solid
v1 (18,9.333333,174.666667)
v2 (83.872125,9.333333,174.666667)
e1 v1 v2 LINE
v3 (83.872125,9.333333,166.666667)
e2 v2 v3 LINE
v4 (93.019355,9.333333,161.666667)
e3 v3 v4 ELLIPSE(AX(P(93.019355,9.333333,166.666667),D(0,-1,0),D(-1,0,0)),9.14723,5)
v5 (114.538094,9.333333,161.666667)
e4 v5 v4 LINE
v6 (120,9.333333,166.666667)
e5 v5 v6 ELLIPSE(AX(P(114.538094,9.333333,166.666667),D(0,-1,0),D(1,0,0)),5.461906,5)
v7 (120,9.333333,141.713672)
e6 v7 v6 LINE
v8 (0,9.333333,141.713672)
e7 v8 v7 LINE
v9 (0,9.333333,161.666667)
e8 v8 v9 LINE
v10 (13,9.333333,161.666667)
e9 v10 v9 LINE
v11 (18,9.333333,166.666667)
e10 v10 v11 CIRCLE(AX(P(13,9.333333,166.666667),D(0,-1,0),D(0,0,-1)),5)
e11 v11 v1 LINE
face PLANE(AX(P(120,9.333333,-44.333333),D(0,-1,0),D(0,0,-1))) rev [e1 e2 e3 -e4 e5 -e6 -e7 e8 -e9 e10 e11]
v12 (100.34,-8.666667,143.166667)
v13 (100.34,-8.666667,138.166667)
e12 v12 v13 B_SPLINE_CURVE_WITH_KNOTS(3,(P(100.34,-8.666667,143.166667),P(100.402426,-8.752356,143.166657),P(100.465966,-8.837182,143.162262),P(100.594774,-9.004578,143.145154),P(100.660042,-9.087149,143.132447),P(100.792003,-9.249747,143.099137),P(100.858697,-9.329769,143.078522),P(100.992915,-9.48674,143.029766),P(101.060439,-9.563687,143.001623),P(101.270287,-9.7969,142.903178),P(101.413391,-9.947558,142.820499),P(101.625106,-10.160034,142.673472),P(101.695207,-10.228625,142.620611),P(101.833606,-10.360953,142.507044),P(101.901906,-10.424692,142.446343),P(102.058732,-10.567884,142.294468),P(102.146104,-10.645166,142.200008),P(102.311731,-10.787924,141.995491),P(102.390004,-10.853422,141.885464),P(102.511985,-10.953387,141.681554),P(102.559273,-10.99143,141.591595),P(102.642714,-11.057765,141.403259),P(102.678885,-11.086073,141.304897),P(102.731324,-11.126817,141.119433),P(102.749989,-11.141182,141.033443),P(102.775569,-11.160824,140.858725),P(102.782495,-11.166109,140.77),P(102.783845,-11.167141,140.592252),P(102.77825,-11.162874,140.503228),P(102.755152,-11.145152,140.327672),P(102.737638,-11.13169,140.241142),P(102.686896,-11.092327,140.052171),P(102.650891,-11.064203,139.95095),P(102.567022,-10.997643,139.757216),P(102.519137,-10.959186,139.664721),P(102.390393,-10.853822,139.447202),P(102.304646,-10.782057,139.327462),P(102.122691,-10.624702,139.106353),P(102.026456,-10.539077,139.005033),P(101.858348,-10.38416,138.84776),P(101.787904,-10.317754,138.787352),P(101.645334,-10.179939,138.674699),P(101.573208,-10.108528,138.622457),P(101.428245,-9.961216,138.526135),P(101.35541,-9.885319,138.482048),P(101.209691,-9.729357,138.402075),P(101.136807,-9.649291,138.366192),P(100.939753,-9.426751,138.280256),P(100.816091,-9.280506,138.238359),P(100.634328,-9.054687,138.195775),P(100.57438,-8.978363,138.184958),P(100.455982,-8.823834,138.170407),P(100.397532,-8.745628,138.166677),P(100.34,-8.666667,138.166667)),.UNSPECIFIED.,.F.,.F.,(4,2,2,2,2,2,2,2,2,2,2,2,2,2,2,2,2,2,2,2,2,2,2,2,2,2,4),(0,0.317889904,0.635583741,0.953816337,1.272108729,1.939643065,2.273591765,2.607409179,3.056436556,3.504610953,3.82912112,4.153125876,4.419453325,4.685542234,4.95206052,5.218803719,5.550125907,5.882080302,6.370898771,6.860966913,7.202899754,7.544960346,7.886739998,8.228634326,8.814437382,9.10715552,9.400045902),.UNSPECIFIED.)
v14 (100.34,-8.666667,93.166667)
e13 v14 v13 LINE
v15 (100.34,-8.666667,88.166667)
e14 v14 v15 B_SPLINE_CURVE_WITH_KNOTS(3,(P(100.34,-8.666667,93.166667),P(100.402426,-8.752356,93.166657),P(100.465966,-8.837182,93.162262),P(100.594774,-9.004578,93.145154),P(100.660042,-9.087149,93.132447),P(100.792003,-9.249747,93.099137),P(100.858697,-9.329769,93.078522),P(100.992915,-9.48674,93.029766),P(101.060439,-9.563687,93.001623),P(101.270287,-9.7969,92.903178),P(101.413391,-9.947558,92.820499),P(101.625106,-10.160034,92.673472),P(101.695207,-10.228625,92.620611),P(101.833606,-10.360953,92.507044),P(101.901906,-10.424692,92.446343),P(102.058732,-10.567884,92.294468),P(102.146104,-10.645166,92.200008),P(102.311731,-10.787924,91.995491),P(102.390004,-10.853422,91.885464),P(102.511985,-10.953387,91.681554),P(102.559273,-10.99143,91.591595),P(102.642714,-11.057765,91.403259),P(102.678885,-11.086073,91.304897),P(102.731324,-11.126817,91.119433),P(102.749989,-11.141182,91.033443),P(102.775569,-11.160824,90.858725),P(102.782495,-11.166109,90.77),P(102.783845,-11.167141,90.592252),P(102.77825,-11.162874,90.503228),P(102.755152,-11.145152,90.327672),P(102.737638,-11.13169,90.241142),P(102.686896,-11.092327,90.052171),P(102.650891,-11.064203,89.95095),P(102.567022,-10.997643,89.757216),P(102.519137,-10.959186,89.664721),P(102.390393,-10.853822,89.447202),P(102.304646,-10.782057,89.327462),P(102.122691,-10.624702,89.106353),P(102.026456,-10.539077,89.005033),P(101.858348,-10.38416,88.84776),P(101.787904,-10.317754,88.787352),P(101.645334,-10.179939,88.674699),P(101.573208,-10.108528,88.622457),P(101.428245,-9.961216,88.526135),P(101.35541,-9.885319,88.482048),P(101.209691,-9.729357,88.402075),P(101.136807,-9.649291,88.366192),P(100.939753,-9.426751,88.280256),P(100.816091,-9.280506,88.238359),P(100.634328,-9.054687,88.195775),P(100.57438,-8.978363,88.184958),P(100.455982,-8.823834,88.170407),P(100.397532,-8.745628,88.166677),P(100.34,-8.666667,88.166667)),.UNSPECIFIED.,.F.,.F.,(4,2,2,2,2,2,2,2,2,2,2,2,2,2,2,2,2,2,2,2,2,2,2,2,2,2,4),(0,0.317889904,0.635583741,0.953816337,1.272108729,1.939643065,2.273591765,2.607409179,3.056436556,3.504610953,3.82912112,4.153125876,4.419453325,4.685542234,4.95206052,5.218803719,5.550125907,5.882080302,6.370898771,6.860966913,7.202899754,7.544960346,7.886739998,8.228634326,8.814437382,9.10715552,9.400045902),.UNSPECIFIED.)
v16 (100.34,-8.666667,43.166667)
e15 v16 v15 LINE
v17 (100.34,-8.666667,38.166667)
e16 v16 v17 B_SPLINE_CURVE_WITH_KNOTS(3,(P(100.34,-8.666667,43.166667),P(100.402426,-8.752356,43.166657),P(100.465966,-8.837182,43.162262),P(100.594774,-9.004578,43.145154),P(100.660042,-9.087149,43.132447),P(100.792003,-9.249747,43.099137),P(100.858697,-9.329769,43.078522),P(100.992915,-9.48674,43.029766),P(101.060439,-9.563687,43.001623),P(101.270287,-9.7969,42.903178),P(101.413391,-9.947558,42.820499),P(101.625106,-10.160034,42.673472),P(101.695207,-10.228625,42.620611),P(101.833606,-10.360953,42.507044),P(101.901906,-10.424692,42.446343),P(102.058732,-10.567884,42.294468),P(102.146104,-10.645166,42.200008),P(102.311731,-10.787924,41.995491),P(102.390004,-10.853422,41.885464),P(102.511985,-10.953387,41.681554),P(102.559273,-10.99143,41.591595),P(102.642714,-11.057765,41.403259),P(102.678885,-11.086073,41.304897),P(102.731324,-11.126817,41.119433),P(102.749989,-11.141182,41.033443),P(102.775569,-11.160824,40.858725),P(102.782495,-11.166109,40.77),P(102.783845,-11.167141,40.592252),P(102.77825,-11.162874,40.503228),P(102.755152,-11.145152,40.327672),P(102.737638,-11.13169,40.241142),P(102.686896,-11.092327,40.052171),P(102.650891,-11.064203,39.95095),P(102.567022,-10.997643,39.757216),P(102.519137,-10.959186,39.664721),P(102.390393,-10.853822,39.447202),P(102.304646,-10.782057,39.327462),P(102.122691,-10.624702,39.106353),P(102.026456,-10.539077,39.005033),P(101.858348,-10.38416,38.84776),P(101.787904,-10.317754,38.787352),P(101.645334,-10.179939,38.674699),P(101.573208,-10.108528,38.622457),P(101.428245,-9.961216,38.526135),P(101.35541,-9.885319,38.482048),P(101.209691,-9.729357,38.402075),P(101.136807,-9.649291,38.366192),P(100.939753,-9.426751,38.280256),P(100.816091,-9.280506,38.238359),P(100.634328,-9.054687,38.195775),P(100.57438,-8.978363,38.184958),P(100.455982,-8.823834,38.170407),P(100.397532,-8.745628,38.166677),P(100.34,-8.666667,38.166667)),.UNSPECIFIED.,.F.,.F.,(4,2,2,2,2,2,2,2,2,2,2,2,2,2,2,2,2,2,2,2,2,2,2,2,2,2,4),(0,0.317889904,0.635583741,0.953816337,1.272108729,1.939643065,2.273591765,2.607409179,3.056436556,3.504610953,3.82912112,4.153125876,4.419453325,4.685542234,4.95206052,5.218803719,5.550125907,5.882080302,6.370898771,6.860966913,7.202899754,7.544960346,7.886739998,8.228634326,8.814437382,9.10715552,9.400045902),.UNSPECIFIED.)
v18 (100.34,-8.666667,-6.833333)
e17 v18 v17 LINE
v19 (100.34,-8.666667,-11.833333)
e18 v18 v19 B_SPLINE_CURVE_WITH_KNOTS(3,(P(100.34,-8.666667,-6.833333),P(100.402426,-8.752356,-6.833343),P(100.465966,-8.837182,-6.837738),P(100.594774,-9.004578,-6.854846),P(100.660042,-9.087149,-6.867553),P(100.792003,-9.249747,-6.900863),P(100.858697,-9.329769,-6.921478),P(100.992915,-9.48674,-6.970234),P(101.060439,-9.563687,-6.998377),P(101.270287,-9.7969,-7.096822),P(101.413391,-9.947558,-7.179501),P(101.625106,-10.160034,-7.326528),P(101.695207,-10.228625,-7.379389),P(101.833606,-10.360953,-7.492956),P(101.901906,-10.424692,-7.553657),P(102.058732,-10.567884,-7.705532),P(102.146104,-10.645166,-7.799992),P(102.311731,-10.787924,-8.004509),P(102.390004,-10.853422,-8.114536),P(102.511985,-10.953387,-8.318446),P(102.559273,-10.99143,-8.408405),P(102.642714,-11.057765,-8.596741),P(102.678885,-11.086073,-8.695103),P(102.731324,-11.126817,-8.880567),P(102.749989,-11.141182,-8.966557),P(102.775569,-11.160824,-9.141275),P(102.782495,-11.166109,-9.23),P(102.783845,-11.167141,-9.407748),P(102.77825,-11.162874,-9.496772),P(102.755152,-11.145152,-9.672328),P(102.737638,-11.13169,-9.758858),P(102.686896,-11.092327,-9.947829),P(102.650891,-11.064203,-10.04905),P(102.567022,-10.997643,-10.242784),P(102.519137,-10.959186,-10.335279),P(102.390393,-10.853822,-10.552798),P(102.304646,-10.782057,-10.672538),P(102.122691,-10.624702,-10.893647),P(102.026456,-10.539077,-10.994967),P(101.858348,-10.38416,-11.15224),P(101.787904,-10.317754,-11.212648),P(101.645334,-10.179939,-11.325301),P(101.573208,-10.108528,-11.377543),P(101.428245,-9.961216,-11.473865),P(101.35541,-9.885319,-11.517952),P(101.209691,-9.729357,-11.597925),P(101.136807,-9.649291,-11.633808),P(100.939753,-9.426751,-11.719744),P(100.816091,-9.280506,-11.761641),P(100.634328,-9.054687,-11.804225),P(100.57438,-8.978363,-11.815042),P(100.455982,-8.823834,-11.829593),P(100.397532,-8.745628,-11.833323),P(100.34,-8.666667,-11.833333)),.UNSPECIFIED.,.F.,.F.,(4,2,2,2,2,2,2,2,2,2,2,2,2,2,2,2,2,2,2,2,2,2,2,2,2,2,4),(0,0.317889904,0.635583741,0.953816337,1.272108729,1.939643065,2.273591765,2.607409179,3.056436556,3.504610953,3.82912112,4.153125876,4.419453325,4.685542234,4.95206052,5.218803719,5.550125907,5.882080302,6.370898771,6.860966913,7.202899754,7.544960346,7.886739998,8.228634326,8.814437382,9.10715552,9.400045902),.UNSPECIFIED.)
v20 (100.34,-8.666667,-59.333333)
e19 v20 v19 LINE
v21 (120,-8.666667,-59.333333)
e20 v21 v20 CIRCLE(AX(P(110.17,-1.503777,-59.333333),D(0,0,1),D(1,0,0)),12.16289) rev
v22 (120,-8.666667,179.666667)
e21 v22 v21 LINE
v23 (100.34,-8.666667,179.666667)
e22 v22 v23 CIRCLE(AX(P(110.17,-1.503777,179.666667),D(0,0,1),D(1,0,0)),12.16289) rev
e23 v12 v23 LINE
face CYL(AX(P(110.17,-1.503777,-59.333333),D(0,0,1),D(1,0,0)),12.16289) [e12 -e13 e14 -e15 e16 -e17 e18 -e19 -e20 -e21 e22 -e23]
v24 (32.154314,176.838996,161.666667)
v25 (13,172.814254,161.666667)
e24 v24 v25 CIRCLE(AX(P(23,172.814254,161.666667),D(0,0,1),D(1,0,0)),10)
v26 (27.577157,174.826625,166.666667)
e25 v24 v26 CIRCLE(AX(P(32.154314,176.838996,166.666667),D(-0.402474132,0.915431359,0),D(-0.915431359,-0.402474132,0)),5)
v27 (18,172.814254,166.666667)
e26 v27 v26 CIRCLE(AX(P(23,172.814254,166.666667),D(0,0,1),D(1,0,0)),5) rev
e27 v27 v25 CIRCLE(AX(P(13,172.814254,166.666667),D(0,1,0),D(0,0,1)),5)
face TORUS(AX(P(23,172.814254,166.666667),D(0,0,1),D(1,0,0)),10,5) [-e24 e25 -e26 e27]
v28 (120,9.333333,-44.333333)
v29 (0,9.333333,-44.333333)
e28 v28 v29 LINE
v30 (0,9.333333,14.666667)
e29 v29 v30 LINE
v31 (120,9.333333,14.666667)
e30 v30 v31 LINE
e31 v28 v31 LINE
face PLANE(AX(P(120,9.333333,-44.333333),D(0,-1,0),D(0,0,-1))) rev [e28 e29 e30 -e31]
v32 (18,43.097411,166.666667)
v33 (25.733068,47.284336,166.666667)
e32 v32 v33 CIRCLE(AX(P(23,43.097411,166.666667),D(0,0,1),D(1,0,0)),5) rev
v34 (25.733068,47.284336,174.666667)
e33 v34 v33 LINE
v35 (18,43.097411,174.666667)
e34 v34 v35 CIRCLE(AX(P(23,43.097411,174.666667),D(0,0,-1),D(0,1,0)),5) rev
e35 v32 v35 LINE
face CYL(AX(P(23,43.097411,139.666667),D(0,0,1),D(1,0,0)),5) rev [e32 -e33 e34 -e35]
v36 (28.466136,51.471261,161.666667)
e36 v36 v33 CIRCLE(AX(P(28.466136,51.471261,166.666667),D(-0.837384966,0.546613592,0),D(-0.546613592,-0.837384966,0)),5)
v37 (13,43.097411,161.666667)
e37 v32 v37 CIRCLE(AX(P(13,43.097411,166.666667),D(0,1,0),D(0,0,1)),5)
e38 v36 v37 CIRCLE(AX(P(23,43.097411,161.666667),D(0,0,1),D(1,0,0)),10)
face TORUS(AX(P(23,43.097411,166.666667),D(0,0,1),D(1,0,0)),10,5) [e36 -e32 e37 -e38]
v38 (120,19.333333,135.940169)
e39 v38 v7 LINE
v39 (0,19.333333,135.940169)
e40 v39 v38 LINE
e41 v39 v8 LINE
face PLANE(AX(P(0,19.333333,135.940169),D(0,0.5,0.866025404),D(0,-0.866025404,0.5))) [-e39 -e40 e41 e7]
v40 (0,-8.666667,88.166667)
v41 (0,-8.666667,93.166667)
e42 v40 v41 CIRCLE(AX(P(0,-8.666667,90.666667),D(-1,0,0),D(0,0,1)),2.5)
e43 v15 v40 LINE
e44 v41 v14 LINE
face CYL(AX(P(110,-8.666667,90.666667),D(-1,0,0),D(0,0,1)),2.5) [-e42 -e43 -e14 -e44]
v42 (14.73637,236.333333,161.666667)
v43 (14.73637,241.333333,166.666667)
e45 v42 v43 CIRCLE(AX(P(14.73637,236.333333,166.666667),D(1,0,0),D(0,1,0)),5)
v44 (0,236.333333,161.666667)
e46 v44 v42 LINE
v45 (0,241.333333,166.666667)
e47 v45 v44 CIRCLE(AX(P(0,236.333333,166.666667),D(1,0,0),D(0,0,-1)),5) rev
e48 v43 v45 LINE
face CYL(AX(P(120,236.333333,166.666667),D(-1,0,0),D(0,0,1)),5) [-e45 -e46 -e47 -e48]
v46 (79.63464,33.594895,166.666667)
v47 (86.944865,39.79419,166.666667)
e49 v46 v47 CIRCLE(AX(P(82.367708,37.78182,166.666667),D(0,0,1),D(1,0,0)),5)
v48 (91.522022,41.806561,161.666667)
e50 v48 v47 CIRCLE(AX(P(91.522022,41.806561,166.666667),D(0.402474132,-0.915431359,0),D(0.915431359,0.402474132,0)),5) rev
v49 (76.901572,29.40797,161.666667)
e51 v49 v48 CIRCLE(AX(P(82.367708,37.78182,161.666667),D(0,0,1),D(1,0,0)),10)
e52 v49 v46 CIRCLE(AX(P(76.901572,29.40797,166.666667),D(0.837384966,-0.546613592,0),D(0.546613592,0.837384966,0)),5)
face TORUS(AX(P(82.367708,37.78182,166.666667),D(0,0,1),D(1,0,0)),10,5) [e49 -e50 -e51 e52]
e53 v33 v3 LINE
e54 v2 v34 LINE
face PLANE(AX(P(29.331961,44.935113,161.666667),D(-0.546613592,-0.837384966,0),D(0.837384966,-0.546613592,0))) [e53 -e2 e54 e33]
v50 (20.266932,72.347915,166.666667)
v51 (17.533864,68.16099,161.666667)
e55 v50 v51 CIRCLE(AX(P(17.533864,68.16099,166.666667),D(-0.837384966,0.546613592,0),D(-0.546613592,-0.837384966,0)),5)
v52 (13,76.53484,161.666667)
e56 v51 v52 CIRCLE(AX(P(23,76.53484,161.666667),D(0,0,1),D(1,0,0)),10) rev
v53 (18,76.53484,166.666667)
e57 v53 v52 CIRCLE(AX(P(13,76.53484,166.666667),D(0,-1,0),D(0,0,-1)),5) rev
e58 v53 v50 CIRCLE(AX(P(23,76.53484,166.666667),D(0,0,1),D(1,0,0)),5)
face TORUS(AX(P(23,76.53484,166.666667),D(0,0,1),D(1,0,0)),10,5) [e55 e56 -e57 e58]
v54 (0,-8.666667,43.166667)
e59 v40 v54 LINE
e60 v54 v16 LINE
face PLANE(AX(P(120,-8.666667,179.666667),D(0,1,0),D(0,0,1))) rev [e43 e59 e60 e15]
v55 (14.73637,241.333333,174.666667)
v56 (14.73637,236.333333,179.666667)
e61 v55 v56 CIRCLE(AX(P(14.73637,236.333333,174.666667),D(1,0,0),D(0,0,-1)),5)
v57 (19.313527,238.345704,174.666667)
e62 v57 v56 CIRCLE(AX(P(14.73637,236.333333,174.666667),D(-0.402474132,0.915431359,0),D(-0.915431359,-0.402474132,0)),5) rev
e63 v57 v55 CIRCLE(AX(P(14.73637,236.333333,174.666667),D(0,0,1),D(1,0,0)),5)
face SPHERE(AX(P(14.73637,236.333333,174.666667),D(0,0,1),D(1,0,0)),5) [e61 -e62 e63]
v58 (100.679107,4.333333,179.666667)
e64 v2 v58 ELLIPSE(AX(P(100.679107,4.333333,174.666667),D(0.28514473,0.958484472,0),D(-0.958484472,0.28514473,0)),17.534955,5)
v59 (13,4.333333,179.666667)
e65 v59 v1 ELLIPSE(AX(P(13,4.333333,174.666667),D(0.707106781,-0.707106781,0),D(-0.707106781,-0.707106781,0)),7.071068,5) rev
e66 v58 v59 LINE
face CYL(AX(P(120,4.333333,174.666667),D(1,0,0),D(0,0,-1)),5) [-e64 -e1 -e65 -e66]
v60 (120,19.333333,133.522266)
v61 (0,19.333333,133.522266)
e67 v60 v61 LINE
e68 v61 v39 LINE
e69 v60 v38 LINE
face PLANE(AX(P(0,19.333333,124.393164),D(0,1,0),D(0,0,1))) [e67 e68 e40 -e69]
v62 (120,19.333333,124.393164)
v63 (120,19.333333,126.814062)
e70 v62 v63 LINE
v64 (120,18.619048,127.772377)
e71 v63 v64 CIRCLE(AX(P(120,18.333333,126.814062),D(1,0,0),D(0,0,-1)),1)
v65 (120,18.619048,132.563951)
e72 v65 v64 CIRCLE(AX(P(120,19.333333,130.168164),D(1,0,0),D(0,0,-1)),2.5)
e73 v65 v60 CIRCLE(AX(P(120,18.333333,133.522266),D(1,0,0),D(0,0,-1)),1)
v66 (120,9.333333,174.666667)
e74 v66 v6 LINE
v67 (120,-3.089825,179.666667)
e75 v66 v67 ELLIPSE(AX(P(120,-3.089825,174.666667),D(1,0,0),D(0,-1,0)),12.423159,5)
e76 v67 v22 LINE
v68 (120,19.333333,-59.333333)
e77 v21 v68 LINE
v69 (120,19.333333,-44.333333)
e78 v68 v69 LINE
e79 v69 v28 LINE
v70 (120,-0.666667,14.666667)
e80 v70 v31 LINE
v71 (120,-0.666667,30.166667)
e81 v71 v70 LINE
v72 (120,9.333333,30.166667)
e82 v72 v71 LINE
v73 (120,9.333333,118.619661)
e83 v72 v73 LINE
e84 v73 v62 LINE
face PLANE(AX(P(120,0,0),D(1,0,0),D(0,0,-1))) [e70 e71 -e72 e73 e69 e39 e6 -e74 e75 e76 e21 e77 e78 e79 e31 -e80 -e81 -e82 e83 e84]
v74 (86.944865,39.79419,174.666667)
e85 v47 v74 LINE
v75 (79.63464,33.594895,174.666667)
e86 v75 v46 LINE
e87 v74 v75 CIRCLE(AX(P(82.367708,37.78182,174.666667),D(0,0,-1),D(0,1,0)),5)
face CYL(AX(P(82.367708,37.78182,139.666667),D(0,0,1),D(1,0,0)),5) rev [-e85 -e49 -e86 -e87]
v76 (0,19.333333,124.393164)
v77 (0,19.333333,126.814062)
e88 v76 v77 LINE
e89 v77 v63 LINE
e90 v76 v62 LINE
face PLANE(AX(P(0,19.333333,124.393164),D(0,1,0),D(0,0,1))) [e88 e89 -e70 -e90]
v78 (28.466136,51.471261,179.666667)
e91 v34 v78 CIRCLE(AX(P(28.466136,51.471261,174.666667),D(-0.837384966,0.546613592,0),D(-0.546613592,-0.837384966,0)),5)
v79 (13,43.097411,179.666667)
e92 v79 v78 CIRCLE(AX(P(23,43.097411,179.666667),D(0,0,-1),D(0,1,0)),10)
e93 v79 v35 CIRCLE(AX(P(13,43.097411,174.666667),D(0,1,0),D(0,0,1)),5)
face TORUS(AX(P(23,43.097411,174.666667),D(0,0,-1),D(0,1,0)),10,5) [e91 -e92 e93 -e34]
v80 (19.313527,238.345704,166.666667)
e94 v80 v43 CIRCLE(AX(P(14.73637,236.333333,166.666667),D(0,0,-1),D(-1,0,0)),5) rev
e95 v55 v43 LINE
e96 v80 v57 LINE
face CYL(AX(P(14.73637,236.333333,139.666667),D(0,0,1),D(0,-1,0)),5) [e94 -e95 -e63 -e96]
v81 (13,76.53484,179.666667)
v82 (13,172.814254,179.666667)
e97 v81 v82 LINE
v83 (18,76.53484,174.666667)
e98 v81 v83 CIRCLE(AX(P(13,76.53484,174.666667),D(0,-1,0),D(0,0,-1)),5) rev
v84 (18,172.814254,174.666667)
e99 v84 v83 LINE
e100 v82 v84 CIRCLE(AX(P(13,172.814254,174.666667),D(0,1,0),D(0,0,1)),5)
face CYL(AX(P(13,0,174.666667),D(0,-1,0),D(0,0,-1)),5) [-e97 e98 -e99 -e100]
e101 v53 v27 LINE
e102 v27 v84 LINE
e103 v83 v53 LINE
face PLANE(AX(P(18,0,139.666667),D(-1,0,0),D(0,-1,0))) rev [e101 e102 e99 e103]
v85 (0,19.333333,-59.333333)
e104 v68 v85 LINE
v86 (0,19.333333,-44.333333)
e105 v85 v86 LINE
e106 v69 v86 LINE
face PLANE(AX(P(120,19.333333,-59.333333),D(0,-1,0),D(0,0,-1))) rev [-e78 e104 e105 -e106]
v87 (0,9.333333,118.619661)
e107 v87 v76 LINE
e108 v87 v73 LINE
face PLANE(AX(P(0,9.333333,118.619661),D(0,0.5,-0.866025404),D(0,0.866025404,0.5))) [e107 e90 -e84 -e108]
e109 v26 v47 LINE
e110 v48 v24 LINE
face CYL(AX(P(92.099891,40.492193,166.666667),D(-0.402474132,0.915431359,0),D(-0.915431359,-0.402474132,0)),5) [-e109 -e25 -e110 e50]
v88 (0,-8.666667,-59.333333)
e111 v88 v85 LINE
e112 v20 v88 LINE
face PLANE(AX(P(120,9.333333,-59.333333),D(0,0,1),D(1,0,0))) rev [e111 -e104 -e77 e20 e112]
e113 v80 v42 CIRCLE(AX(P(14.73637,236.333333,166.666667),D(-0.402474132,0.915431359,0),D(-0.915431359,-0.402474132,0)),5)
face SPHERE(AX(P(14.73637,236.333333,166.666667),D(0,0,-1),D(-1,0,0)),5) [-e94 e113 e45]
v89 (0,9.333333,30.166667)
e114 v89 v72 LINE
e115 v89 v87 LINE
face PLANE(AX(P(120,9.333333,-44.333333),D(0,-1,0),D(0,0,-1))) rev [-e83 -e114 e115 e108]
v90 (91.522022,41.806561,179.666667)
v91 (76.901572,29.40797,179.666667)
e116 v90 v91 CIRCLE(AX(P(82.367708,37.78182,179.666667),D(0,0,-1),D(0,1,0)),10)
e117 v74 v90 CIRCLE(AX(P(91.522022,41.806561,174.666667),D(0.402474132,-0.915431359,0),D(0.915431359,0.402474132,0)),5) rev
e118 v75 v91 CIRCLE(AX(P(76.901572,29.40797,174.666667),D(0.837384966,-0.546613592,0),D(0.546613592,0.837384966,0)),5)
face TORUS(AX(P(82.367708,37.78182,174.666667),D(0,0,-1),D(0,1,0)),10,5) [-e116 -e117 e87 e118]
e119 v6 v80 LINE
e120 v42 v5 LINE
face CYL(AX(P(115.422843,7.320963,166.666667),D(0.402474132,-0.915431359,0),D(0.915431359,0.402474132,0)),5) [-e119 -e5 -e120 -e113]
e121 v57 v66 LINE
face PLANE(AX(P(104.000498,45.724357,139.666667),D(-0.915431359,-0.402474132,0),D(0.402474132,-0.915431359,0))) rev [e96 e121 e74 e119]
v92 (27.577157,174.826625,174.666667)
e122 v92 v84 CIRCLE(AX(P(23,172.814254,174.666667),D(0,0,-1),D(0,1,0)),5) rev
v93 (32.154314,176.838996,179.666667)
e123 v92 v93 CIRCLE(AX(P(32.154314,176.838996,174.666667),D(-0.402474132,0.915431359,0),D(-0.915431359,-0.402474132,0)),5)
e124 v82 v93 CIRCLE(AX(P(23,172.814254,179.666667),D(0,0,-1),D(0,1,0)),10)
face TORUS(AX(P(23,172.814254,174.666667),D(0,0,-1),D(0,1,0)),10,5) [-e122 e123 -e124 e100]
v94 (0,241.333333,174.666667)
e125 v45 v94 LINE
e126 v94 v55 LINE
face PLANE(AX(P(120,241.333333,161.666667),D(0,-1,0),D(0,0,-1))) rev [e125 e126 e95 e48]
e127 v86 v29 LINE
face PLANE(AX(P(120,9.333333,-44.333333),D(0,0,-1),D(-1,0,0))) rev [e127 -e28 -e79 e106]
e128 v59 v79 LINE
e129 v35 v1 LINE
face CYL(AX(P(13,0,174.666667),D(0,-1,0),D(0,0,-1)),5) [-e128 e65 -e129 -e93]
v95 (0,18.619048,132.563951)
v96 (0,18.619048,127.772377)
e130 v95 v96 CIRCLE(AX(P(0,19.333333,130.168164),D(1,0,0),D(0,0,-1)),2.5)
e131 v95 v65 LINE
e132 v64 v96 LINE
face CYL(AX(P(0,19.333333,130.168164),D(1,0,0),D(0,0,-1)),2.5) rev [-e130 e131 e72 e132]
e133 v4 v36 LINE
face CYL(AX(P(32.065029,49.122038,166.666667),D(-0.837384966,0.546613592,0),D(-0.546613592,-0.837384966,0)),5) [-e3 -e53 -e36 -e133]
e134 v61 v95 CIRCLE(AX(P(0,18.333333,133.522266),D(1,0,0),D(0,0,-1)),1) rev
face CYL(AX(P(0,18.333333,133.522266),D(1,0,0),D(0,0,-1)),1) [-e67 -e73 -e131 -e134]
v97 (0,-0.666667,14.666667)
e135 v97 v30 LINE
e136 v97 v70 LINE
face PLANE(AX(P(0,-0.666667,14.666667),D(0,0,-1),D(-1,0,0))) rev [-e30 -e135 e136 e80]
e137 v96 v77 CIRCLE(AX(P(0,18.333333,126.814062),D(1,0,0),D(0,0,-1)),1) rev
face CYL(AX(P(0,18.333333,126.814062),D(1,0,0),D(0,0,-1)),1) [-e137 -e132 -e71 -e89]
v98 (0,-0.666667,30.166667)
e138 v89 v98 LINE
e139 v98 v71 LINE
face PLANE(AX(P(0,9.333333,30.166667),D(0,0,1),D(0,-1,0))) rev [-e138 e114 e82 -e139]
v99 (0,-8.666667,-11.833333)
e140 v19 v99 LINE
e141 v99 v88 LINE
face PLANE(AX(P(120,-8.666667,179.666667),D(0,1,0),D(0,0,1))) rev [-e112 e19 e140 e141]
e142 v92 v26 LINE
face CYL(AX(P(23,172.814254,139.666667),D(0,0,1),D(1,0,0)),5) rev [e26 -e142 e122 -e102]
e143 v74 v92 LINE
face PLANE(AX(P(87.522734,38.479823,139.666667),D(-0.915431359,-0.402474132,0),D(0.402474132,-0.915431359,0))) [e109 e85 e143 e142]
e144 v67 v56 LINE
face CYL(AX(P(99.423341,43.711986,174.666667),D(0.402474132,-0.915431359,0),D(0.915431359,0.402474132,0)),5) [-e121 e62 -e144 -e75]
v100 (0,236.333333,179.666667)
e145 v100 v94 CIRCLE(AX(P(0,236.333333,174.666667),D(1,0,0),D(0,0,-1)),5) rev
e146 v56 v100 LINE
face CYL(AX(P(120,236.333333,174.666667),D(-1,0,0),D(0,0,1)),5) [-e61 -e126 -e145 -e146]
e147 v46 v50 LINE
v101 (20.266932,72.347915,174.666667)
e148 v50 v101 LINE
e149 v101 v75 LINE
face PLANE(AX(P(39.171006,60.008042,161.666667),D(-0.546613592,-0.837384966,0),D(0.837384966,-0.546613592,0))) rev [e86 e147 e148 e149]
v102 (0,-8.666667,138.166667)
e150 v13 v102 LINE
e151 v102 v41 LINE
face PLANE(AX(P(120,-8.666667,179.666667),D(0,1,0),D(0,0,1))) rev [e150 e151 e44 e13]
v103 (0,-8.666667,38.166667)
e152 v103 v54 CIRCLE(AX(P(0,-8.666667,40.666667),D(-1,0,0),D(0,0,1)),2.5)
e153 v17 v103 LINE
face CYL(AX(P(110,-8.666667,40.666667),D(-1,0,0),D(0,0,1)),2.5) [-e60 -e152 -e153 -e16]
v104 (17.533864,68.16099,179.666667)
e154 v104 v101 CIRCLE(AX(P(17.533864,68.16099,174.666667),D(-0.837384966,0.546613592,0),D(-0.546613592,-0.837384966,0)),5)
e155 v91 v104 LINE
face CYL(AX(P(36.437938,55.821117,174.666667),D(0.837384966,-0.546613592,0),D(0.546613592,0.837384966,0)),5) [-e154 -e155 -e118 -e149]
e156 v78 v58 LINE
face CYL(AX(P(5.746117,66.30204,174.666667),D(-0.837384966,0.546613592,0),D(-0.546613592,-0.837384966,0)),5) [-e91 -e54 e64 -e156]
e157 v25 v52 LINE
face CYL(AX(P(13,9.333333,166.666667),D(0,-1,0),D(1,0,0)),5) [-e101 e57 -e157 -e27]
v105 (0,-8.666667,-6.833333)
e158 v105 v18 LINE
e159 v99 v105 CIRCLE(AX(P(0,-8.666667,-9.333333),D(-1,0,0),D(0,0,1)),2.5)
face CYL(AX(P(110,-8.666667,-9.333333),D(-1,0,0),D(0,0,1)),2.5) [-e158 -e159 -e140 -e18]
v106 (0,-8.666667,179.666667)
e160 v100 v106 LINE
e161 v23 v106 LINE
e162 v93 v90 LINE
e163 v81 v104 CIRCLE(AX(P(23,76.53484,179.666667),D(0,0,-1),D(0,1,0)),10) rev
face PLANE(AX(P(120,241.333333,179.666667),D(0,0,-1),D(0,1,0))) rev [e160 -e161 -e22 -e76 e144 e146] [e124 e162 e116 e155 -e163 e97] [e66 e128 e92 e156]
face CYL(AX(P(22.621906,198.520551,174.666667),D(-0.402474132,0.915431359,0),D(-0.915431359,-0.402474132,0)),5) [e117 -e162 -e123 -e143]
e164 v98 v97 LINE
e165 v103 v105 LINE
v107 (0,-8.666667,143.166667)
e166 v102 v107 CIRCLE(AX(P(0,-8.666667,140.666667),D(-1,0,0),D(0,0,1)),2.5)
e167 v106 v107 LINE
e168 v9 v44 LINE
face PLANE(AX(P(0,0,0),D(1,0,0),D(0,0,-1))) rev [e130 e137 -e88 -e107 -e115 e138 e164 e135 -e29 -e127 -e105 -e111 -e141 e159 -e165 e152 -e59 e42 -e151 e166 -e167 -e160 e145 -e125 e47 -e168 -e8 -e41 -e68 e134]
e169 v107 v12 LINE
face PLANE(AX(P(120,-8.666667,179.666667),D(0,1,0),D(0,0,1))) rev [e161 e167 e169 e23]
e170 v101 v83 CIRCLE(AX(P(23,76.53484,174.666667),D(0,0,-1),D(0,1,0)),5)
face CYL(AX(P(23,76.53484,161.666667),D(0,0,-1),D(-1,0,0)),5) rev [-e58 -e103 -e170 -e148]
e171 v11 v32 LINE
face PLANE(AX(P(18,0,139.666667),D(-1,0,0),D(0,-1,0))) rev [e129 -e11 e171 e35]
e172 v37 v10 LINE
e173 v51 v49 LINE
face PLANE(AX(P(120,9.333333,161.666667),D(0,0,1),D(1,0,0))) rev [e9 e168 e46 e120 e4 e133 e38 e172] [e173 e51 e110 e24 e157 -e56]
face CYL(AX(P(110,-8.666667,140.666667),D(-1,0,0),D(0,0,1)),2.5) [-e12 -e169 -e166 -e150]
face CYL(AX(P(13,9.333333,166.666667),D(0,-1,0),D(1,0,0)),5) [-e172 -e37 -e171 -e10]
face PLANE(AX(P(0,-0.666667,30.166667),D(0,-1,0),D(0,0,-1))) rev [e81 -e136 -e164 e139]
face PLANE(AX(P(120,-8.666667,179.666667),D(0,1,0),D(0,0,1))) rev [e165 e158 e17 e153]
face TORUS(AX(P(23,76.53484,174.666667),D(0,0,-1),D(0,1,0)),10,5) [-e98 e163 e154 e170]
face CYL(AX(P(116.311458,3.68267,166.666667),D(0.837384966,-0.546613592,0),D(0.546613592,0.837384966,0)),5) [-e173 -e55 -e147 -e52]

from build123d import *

# Parameters (mm, degrees)
EXTRUDE_1_DEPTH     = 120
SKETCH_2_W          = 15.5
SKETCH_2_H          = 10
CUT_EXTRUDE_1_DEPTH = 324.916484435
CUT_EXTRUDE_2_DEPTH = 40
CUT_EXTRUDE_3_DEPTH = 40
FILLET_16_R         = 5
EXTRUDE_2_DEPTH     = 239
EXTRUDE_3_DEPTH     = 18
FILLET_17_R         = 5
EXTRUDE_4_DEPTH     = 120
SKETCH_11_R         = 2.5
EXTRUDE_5_DEPTH     = 110
SKETCH_12_R         = 2.5
CUT_EXTRUDE_4_DEPTH = 324.916484528
FILLET_19_R         = 1


with BuildPart() as part:
    # 草圖1 → 填料-伸長1 (new body)
    with BuildSketch(Plane(origin=(0, 0, 0), x_dir=(0, 0, -1), z_dir=(1, 0, 0))):
        Polygon((-179.666666667, 241.333333333), (-179.666666667, -8.666666667), (59.333333333, -8.666666667), (59.333333333, 9.333333333), (59.333333333, 19.333333333), (44.333333333, 19.333333333), (44.333333333, 9.333333333), (-161.666666667, 9.333333333), (-161.666666667, 241.333333333), align=None)
    extrude(amount=EXTRUDE_1_DEPTH)

    # 草圖2 → 除料-伸長1 (cut, through all)
    with BuildSketch(Plane(origin=(120, 0, 0), x_dir=(0, 0, -1), z_dir=(1, 0, 0))):
        with Locations((-22.416666667, 4.333333333)):
            Rectangle(SKETCH_2_W, SKETCH_2_H)
    extrude(amount=-CUT_EXTRUDE_1_DEPTH, mode=Mode.SUBTRACT)

    # 草圖4 → 除料-伸長2 (cut)
    with BuildSketch(Plane.XY.offset(179.666666667)):
        Polygon((120, 241.333333333), (18, 241.333333333), (120, 9.333333333), align=None)
    extrude(amount=-CUT_EXTRUDE_2_DEPTH, mode=Mode.SUBTRACT)

    # 草圖5 → 除料-伸長3 (cut)
    with BuildSketch(Plane.XY.offset(179.666666667)):
        Polygon((100.337138528, 9.333333333), (18, 196.609962141), (18, 9.333333333), align=None)
    extrude(amount=-CUT_EXTRUDE_3_DEPTH, mode=Mode.SUBTRACT)

    # 圓角16
    # the kernel refuses this fillet: 5 mm, written as the material it takes off along each edge
    with BuildSketch(Plane(origin=(14.736369898, 236.333333333, 166.666666667), x_dir=(0, 1, 0), z_dir=(0, 0, -1))) as fillet_16_piece_1_section:
        Polygon((0, 0), (FILLET_16_R, 0), (FILLET_16_R, FILLET_16_R * 0.652726020499), (FILLET_16_R * 0.402474131984, FILLET_16_R * 0.915431359023), align=None)
    fillet_16_piece_1 = extrude(amount=FILLET_16_R, mode=Mode.PRIVATE)
    fillet_16_piece_1 = fillet_16_piece_1 - Plane(origin=(14.736369898, 236.333333333, 166.666666667), x_dir=(-0.5465921093537591, -0.8373989885306815, 0), z_dir=(0, 0, -1)) * Sphere(FILLET_16_R, mode=Mode.PRIVATE)
    add(fillet_16_piece_1, mode=Mode.SUBTRACT)
    with BuildSketch(Plane(origin=(14.736369898, 236.333333333, 174.666666667), x_dir=(0, 1, 0), z_dir=(0, 0, 1))) as fillet_16_piece_2_section:
        Polygon((0, 0), (FILLET_16_R, 0), (FILLET_16_R, -FILLET_16_R * 0.652726020499), (FILLET_16_R * 0.402474131984, -FILLET_16_R * 0.915431359023), align=None)
    fillet_16_piece_2 = extrude(amount=FILLET_16_R, mode=Mode.PRIVATE)
    fillet_16_piece_2 = fillet_16_piece_2 - Plane(origin=(14.736369898, 236.333333333, 174.666666667), x_dir=(-0.5465921093537591, -0.8373989885306815, 0), z_dir=(0, 0, 1)) * Sphere(FILLET_16_R, mode=Mode.PRIVATE)
    add(fillet_16_piece_2, mode=Mode.SUBTRACT)
    with BuildSketch(Plane(origin=(-12.5, 241.333333333, 161.666666667), x_dir=(0, 0, 1), z_dir=(1, 0, 0)), Plane(origin=(-12.5, 241.333333333, 179.666666667), x_dir=(0, -1, 0), z_dir=(1, 0, 0))) as fillet_16_piece_3:
        with BuildLine():
            CenterArc((FILLET_16_R, FILLET_16_R), FILLET_16_R, 180, 90)
            Line((0, FILLET_16_R), (0, 0))
            Line((0, 0), (FILLET_16_R, 0))
        make_face()
    extrude(amount=27.236369898, mode=Mode.SUBTRACT)
    with BuildSketch(Plane(origin=(18, 241.333333333, 174.666666667), x_dir=(-1, 0, 0), z_dir=(0, 0, -1))) as fillet_16_piece_4:
        with BuildLine():
            CenterArc((FILLET_16_R * 0.652726020499, -FILLET_16_R), FILLET_16_R, 90, 66.267060196)
            Line((-FILLET_16_R * 0.262705338524, -FILLET_16_R * 0.597525868016), (0, 0))
            Line((0, 0), (FILLET_16_R * 0.652726020499, 0))
        make_face()
    extrude(amount=8, mode=Mode.SUBTRACT)
    with BuildSketch(Plane(origin=(19.313526693, 238.345703993, 161.666666667), x_dir=(0, 0, 1), z_dir=(0.40247413198441667, -0.9154313590233789, 0))) as fillet_16_piece_5_section:
        with BuildLine():
            CenterArc((FILLET_16_R, FILLET_16_R), FILLET_16_R, 180, 90)
            Line((0, FILLET_16_R), (0, 0))
            Line((0, 0), (FILLET_16_R, 0))
        make_face()
    fillet_16_piece_5 = extrude(amount=262.668806653, mode=Mode.PRIVATE)
    fillet_16_piece_5 = split(fillet_16_piece_5, bisect_by=Plane(origin=(68.522420019, 9.333333333, 162.799850977), z_dir=(0, 1, 0)), keep=Keep.TOP, mode=Mode.PRIVATE)
    add(fillet_16_piece_5, mode=Mode.SUBTRACT)
    with BuildSketch(Plane(origin=(19.313526693, 238.345703993, 179.666666667), x_dir=(-0.9154313590233789, -0.40247413198441667, 5.6843418860808026e-15), z_dir=(0.40247413198441667, -0.9154313590233789, 0))) as fillet_16_piece_6:
        with BuildLine():
            CenterArc((FILLET_16_R, FILLET_16_R), FILLET_16_R, 180, 90)
            Line((0, FILLET_16_R), (0, 0))
            Line((0, 0), (FILLET_16_R, 0))
        make_face()
    extrude(amount=262.668806653, mode=Mode.SUBTRACT)

    # 草圖8 → 填料-伸長2 (add)
    with BuildSketch(Plane.XY.offset(179.666666667)):
        with BuildLine():
            ThreePointArc((110.17, -13.666666712), (115.684274668, -12.344840676), (120, -8.666666667))
            Line((120, -8.666666667), (110.17, -8.666666667))
            Line((110.17, -8.666666667), (110.17, -13.666666667))
        make_face()
        with BuildLine():
            Line((110.17, -13.666666667), (110.17, -8.666666667))
            Line((110.17, -8.666666667), (100.34, -8.666666667))
            ThreePointArc((100.34, -8.666666667), (104.655725332, -12.344840676), (110.17, -13.666666712))
        make_face()
        with BuildLine():
            ThreePointArc((110.17, -13.666666712), (115.684274668, -12.344840676), (120, -8.666666667))
            Line((120, -8.666666667), (110.17, -8.666666667))
            Line((110.17, -8.666666667), (110.17, -13.666666667))
        make_face()
        with BuildLine():
            Line((110.17, -13.666666667), (110.17, -8.666666667))
            Line((110.17, -8.666666667), (100.34, -8.666666667))
            ThreePointArc((100.34, -8.666666667), (104.655725332, -12.344840676), (110.17, -13.666666712))
        make_face()
    extrude(amount=-EXTRUDE_2_DEPTH)

    # 草圖9 → 填料-伸長3 (add)
    with BuildSketch(Plane.XY.offset(179.666666667)):
        Polygon((18, 63.079938443), (100.337138528, 9.333333333), (93.709875708, 24.407107589), (22.919522331, 70.616403134), (18, 73.827683351), align=None)
        Polygon((18, 52.332193536), (83.872125352, 9.333333333), (100.337138528, 9.333333333), (18, 63.079938443), align=None)
        Polygon((100.337138528, 9.333333333), (83.872125352, 9.333333333), (95.417616197, 1.796868643), align=None)
        Polygon((93.711170014, 24.406262715), (100.337138528, 9.333333333), (105.256660859, 16.869798024), align=None)
        Polygon((10.463535309, 67.999460774), (18, 63.079938443), (18, 73.827683351), (15.38305764, 75.535925465), align=None)
        Polygon((13.080477669, 55.543473753), (18, 52.332193536), (18, 63.079938443), align=None)
    extrude(amount=-EXTRUDE_3_DEPTH)

    # 圓角17
    fillet_17_edges = [part.edges().sort_by_distance(p)[0] for p in [
        (93.709875708, 24.407107589, 170.666666667),
        (18, 30.832763435, 179.666666667),
        (18, 30.832763435, 161.666666667),
        (18, 52.332193536, 170.666666667),
        (50.936062676, 30.832763435, 161.666666667),
        (50.936062676, 30.832763435, 179.666666667),
        (18, 73.827683351, 170.666666667),
        (55.854937854, 49.11739547, 179.666666667),
        (55.854937854, 49.11739547, 161.666666667),
        (55.854937854, 110.508534865, 161.666666667),
        (18, 135.218822746, 161.666666667),
        (18, 196.609962141, 170.666666667),
        (55.854937854, 110.508534865, 179.666666667),
        (18, 135.218822746, 179.666666667),
        (50.936062676, 9.333333333, 179.666666667),
    ]]
    fillet(fillet_17_edges, radius=FILLET_17_R)

    # 草圖10 → 填料-伸長4 (add)
    with BuildSketch(Plane(origin=(120, 0, 0), x_dir=(0, 0, -1), z_dir=(1, 0, 0))):
        Polygon((-118.619661283, 9.333333333), (-124.393163975, 19.333333333), (-135.940169359, 19.333333333), (-141.71367205, 9.333333333), (-135.940169359, -0.666666667), (-124.393163975, -0.666666667), align=None)
    extrude(amount=-EXTRUDE_4_DEPTH)

    # 草圖11 → 填料-伸長5 (add)
    with BuildSketch(Plane.ZY):
        with Locations((140.666666667, -8.666666667)):
            Circle(SKETCH_11_R)
        with Locations((90.666666667, -8.666666667)):
            Circle(SKETCH_11_R)
        with Locations((40.666666667, -8.666666667)):
            Circle(SKETCH_11_R)
        with Locations((-9.333333333, -8.666666667)):
            Circle(SKETCH_11_R)
    extrude(amount=-EXTRUDE_5_DEPTH)

    # 草圖12 → 除料-伸長4 (cut, through all)
    with BuildSketch(Plane(origin=(120, 0, 0), x_dir=(0, 0, -1), z_dir=(1, 0, 0))):
        with Locations((-130.168163975, 19.333333333)):
            Circle(SKETCH_12_R)
    extrude(amount=-CUT_EXTRUDE_4_DEPTH, mode=Mode.SUBTRACT)

    # 圓角19
    fillet_19_edges = [part.edges().sort_by_distance(p)[0] for p in [
        (60, 19.333333333, 127.668163975),
        (60, 19.333333333, 132.668163975),
    ]]
    fillet(fillet_19_edges, radius=FILLET_19_R)


solid = part.part
